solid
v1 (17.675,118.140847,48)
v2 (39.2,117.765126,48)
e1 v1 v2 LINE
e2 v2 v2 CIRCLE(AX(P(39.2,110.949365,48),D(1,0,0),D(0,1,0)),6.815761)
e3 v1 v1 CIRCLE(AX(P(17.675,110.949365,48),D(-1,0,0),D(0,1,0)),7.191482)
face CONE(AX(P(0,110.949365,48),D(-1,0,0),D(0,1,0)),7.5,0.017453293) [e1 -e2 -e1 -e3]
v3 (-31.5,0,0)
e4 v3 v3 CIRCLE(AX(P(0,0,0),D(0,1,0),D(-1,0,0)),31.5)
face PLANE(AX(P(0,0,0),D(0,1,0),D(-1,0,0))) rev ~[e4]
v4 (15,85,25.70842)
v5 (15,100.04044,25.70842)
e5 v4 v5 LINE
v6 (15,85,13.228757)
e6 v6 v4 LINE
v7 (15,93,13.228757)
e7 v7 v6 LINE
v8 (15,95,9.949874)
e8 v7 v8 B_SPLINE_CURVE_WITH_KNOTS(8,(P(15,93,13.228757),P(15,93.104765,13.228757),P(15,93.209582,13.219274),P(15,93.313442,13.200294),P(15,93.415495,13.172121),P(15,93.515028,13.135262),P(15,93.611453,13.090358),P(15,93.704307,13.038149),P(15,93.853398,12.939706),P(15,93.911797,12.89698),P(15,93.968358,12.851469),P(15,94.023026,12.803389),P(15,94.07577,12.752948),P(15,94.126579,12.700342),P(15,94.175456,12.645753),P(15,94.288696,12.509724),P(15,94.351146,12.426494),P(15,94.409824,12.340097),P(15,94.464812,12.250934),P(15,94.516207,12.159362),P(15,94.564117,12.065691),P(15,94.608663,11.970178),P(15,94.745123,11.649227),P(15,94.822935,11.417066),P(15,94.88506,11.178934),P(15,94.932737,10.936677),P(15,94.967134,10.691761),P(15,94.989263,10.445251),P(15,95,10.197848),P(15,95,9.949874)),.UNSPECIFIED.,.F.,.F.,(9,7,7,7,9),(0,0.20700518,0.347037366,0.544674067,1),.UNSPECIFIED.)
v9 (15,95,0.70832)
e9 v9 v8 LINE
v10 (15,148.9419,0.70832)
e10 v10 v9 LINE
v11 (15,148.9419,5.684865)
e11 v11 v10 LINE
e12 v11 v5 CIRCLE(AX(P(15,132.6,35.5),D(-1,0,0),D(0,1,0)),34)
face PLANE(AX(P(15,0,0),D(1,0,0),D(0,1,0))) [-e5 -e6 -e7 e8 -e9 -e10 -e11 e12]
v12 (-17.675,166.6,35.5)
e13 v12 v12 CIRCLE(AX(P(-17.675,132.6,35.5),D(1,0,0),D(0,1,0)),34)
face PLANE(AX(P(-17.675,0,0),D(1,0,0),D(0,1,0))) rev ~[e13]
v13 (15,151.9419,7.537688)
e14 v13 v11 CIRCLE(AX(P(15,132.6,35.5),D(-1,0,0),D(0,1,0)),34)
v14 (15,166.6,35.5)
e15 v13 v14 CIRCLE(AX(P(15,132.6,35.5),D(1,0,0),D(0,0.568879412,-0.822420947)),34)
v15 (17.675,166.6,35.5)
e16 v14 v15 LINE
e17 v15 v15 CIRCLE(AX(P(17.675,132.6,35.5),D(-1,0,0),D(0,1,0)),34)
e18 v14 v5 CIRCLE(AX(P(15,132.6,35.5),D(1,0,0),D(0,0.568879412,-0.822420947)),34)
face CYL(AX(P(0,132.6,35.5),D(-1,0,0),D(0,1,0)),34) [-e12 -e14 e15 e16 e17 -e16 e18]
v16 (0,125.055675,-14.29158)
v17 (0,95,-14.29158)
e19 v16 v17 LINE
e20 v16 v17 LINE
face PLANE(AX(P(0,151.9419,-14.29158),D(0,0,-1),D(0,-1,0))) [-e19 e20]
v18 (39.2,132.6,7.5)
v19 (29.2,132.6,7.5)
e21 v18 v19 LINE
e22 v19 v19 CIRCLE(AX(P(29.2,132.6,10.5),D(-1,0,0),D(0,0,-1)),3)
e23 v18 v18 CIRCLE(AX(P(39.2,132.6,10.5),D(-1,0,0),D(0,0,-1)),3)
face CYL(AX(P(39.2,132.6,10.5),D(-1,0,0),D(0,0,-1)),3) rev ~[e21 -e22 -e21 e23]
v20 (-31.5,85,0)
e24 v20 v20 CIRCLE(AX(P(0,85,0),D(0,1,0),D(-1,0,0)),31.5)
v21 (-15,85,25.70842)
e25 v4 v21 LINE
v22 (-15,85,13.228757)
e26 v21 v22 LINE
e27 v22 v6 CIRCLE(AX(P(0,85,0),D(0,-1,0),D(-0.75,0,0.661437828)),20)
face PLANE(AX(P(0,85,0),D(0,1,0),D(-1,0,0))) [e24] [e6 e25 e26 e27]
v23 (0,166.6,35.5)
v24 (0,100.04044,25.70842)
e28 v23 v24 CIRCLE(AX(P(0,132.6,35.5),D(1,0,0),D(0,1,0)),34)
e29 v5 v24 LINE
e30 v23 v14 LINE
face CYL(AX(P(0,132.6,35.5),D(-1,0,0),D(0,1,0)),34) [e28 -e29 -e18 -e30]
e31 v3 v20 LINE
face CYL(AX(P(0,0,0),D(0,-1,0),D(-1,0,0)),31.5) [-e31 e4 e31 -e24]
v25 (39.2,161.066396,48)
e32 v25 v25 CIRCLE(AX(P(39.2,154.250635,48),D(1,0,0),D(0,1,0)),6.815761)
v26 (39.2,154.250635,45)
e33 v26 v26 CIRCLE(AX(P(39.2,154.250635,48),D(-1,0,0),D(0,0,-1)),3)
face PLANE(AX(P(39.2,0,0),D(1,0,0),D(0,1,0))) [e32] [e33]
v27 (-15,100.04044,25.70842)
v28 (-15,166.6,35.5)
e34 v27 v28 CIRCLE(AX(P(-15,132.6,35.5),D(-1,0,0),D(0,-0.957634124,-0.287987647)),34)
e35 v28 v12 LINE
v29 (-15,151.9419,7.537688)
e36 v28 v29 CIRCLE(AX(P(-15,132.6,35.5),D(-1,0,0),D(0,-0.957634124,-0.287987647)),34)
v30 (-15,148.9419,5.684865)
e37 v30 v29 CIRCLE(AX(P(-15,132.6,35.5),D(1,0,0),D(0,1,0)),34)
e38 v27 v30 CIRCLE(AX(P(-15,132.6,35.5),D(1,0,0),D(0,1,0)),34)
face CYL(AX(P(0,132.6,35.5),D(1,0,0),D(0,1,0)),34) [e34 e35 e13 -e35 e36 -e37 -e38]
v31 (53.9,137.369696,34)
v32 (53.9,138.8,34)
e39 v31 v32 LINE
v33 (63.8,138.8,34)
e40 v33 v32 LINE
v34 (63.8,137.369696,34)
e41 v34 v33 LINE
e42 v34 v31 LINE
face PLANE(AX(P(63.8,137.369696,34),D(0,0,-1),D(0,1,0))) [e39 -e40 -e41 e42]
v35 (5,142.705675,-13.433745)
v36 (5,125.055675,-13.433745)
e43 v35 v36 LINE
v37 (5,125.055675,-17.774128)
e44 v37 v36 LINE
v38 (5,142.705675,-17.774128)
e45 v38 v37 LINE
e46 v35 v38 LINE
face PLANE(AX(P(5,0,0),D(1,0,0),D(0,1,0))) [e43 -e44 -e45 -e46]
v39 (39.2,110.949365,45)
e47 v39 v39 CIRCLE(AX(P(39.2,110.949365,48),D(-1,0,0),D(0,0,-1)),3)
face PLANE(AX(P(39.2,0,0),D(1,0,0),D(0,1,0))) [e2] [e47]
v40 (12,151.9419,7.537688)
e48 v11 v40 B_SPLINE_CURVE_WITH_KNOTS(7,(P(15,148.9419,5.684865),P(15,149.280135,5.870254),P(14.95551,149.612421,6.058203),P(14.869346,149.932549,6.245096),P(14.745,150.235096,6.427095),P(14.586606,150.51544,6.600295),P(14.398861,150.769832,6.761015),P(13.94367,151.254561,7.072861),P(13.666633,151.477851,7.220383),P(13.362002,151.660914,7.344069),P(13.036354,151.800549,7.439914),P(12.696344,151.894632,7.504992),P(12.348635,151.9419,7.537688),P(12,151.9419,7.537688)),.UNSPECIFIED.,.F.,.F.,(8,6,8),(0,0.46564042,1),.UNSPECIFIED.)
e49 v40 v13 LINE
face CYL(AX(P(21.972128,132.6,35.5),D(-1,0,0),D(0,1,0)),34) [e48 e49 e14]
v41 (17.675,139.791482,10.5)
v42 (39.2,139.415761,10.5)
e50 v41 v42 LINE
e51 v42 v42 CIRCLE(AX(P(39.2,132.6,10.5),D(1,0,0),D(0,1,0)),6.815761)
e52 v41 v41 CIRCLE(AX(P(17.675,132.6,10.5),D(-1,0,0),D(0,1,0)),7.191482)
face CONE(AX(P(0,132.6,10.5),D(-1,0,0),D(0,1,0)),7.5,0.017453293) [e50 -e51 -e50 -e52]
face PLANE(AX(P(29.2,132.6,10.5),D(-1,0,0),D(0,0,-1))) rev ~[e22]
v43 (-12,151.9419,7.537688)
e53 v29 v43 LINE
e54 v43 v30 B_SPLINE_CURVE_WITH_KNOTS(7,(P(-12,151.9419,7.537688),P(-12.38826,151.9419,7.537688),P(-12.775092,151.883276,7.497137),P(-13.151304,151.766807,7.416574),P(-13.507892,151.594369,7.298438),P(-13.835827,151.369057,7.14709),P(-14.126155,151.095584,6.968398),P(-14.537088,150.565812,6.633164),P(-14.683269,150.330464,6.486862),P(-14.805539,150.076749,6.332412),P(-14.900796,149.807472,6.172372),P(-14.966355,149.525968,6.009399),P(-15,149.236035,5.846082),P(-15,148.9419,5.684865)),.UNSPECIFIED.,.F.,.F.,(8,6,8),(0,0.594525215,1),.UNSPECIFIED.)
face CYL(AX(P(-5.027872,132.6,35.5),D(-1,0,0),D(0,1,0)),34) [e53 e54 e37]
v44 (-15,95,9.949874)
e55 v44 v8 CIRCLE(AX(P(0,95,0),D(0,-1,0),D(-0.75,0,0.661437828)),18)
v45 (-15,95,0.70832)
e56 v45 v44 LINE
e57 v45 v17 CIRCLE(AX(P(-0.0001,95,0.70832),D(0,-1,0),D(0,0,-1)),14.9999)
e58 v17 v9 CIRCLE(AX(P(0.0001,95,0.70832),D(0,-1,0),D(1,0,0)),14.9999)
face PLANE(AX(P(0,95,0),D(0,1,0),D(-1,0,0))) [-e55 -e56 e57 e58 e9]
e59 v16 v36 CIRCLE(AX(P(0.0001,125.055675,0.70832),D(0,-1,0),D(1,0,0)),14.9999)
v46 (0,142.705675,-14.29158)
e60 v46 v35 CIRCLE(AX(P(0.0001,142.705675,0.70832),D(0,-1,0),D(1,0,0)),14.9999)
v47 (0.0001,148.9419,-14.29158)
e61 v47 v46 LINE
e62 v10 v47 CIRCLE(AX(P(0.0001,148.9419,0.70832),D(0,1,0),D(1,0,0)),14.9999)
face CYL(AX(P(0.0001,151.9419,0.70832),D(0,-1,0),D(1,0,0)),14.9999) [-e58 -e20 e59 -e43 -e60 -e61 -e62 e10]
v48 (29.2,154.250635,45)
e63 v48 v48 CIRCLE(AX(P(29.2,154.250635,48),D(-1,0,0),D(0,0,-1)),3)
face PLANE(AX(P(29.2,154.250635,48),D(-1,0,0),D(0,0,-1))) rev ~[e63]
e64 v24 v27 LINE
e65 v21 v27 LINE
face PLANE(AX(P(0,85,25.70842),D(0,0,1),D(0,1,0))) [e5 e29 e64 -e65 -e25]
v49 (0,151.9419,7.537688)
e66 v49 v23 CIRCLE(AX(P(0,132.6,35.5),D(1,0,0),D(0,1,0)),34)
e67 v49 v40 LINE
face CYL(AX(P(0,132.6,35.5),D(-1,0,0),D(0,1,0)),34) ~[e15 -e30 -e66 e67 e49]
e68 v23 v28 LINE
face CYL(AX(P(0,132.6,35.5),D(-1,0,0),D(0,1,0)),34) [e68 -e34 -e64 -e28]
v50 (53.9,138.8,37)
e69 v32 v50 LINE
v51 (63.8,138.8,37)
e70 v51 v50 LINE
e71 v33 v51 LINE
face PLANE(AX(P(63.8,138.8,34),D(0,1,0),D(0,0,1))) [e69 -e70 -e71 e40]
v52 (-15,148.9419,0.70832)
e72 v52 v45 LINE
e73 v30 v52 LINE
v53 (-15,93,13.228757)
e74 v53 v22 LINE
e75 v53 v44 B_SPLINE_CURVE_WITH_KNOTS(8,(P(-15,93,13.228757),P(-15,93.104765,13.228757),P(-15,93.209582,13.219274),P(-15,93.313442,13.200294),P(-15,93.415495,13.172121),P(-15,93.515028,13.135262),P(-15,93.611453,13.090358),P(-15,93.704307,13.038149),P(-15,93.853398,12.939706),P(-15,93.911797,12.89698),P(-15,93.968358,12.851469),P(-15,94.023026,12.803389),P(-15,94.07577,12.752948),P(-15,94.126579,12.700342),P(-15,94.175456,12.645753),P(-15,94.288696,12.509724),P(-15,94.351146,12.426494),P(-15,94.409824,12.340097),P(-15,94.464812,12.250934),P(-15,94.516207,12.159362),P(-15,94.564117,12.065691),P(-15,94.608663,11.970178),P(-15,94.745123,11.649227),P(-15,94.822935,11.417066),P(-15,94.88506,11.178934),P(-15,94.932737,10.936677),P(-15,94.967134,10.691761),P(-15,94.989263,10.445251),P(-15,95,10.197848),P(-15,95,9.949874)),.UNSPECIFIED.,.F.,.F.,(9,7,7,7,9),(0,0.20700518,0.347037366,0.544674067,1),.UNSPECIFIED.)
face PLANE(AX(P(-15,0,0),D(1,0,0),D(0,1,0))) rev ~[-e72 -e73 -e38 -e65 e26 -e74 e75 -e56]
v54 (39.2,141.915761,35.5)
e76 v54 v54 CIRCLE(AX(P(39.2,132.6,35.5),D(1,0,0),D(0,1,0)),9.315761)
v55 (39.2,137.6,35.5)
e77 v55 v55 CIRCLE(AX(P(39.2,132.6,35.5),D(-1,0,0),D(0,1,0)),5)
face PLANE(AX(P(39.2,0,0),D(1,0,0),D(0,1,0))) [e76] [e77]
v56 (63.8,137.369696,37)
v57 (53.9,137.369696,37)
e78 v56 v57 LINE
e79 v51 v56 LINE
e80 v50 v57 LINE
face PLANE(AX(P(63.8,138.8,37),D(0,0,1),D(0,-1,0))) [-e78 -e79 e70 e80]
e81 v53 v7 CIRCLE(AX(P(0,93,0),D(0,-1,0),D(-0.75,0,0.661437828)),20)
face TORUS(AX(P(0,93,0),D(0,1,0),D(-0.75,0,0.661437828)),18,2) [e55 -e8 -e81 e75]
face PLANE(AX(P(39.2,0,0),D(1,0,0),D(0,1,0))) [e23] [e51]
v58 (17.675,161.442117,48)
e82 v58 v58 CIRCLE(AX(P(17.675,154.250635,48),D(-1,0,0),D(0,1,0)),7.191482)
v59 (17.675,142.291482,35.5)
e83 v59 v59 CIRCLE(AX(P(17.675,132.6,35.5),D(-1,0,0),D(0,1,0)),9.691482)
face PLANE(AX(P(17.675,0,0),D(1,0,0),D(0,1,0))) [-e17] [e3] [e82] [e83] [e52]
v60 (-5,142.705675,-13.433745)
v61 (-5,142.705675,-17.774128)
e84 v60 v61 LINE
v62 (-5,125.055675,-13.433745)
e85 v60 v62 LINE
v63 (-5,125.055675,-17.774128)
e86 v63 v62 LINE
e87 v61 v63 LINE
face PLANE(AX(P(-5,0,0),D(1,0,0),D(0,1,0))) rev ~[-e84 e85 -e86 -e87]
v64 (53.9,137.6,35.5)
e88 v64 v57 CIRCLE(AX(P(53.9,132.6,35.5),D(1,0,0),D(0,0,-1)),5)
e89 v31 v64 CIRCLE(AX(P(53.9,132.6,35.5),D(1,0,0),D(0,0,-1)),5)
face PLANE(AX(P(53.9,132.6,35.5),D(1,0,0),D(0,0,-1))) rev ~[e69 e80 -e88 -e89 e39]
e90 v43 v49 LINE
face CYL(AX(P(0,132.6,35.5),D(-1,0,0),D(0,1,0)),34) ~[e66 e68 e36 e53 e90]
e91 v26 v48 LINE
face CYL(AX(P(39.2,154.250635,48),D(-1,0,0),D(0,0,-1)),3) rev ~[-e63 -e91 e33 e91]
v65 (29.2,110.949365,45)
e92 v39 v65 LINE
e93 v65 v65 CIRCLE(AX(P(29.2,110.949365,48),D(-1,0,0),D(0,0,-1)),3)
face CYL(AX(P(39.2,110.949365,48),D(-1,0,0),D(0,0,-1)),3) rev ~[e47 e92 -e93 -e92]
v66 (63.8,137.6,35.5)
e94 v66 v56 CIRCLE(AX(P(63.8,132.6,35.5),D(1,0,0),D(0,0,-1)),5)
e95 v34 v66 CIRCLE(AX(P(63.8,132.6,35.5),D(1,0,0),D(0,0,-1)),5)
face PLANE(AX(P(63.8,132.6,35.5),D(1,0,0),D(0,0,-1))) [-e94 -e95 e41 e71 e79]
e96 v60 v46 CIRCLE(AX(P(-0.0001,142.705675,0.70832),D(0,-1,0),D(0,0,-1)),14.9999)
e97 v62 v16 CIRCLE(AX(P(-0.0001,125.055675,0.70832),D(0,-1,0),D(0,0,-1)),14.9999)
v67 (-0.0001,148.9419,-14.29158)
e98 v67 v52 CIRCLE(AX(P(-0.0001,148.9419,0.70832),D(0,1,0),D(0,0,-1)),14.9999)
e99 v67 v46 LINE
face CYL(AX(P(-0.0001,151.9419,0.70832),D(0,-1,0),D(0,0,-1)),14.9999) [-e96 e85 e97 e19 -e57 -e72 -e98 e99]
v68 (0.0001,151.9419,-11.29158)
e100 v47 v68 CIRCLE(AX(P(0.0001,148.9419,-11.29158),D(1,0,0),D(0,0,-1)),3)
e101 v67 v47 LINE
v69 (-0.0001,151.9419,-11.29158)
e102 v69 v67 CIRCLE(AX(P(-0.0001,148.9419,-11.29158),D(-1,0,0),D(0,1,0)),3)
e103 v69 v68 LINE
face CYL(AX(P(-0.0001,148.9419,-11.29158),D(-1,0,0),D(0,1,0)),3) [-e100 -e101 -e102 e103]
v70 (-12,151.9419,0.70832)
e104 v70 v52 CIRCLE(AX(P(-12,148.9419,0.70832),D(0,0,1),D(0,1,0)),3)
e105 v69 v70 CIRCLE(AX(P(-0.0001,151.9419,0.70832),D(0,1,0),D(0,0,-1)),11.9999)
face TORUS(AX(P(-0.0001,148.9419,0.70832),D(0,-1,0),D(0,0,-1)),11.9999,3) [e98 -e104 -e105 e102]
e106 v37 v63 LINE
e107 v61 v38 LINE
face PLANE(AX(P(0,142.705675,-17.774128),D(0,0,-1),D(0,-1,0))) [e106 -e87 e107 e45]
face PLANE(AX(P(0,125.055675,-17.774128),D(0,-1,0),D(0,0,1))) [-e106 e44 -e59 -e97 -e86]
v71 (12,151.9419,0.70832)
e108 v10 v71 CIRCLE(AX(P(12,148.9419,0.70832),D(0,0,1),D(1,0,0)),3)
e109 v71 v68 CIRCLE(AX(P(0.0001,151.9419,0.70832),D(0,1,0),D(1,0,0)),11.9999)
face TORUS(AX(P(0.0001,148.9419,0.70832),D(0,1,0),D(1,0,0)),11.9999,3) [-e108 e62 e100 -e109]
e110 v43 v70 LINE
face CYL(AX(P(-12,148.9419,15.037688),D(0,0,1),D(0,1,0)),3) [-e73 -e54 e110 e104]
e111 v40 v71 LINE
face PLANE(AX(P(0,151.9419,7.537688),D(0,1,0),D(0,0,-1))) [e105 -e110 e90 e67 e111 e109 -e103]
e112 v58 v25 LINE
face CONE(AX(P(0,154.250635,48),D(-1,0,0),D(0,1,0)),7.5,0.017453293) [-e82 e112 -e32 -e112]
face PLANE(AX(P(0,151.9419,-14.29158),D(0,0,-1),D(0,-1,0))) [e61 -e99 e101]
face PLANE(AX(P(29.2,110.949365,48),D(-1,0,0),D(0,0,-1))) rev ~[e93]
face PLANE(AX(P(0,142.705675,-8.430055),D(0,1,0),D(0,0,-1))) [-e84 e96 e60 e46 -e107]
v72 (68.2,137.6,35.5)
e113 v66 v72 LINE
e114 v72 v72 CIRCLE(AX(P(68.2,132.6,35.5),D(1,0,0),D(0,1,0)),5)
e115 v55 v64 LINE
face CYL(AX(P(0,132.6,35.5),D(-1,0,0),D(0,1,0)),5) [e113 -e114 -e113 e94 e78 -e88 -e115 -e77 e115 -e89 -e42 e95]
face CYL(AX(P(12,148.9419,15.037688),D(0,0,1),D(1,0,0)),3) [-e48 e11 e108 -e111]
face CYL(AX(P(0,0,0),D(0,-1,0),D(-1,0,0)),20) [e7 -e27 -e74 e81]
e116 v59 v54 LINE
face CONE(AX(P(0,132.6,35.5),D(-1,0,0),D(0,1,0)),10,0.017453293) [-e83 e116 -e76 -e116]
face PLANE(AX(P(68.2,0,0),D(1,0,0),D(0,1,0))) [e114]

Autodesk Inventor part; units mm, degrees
sketch "Sketch1" plane through (0, 0, 0) normal (0, 1, 0) x (-1, 0, 0)
  circle A0 centre (0, 0) radius 31.5
  circle A1 centre (0, 0) radius 20
  dimension "d0" = 63
  dimension "d29" = 40
extrude "Extrusion1" add sketch "Sketch1" along normal blind 85 contours A0 | A1
sketch "Sketch2" plane through (0, 0, 0) normal (1, 0, 0) x (0, 1, 0)
  line L0 (0, -31.5) -> (85, -31.5)
  line L1 (0, -31.5) -> (0, 69.5)
  line L2 (0, 69.5) -> (166.6, 69.5)
  line L3 (166.6, 69.5) -> (166.6, 35.5)
  line L4 (166.6, 35.5) -> (132.6, 35.5)
  circle A0 centre (132.6, 35.5) radius 34
  circle A1 centre (132.6, 35.5) radius 25
  circle A2 centre (132.6, 10.5) radius 7.5
  circle A3 centre (132.6, 10.5) radius 3
  circle A4 centre (154.250635, 48) radius 7.5
  circle A5 centre (154.250635, 48) radius 3
  circle A6 centre (110.949365, 48) radius 7.5
  circle A7 centre (110.949365, 48) radius 3
  line L5 (85, -31.5) -> (85, 31.5)
  line L6 (85, 25.70842) -> (151.9419, 25.70842)
  line L7 (151.9419, 25.70842) -> (151.9419, -14.29158)
  line L8 (151.9419, -14.29158) -> (85, -14.29158)
  line L9 (85, -14.29158) -> (85, 25.70842)
  circle A8 centre (132.6, 35.5) radius 10
  circle A9 centre (132.6, 35.5) radius 5
  line L10 (85, 31.5) -> (85, 0)
  line L11 (85, 0) -> (100.814017, 0)
  point P0 (0, 0)
  point P1 (151.9419, 7.537688)
  point P2 (134.938396, 1.580508)
  point P3 (130.261604, 1.580508)
  point P4 (100.04044, 25.70842)
  point P5 (92.907008, 0)
  dimension "d8" = 50
  dimension "d3" = 101
  dimension "d4" = 166.6
  dimension "d5" = 34
  dimension "d6" = 34
  dimension "d7" = 68
  dimension "d9" = 15
  dimension "d10" = 6
  dimension "d13" = 360
  dimension "d21" = 20
  dimension "d22" = 10
  dimension "d26" = 40
  dimension "d49" = 69.5
  dimension "d50" = 35.5
extrude "Extrusion2" add sketch "Sketch2" along normal mid plane 30 contours L5 L6 A0 L7 L8 | A0 L4 A1 A4 A6 L6 | A0 L7 A1 L4 | L6 A1 A2 L7 A0 | A1 L7 L6 A8 L4 | L4 A8 L6 A1 A6 A4 | L6 A8 L7 A1 A2 | A8 L6 | A4 A1 A5 | A1 A5 A4 | A6 A1 A7 | A1 A7 A6 | L6 A8 | A5 A1 | A1 A5 | A7 A1 | A1 A7 | A9
sketch "Sketch2 outline for Extrusion3" plane through (0, 0, 0) normal (1, 0, 0) x (0, 1, 0)
  circle A0 centre (110.949365, 48) radius 7.5
  circle A1 centre (132.6, 10.5) radius 7.5
  circle A2 centre (154.250635, 48) radius 7.5
  circle A3 centre (132.6, 35.5) radius 10
extrude "Extrusion3" add sketch "Sketch2 outline for Extrusion3" along normal blind 39.2 draft -1
extrude "Extrusion4" add sketch "Sketch2" along normal mid plane 35.35 contours A0 L4 A1 A4 A6 L6 | A0 L7 A1 L4 | L6 A1 A2 L7 A0 | A1 L7 L6 A8 L4 | L4 A8 L6 A1 A6 A4 | L6 A8 L7 A1 A2 | A8 L6 | A4 A1 A5 | A1 A5 A4 | A6 A1 A7 | A1 A7 A6 | A2 A1 A3 | A1 A3 A2 | L6 A8 | A5 A1 | A1 A5 | A7 A1 | A1 A7 | A3 A1 | A1 A3 | A9
extrude "Extrusion5" add sketch "Sketch2" along normal blind 68.2 contours A9
ref_plane "Work Plane1" through (-31.5, 0, 0) normal (1, 0, 0) x (0, 1, 0)
fillet "Fillet1" radius 15 2 edges at (15, 118.471, -14.2916) (-15, 118.471, -14.2916)
fillet "Fillet2" radius 3 3 edges at (15, 151.9419, 4.123) (-15, 151.9419, 4.123) (10.6066, 151.9419, -9.8982)
extrude "Extrusion6" add sketch "Sketch1" along normal blind 95 contours A1
fillet "Fillet3" radius 2 1 edges at (0, 95, -20)
ref_plane "Work Plane2" through (63.8, 132.6, 35.5) normal (1, 0, 0) x (0, 0, -1)
sketch "Sketch3" plane through (39.2, 154.250635, 48) normal (1, 0, 0) x (0, 0, -1)
  circle A0 centre (0, 0) radius 3
  circle A1 centre (37.5, -21.650635) radius 6.815761
  circle A2 centre (37.5, -21.650635) radius 3
  circle A3 centre (0, -43.30127) radius 6.815761
  circle A4 centre (0, -43.30127) radius 3
  point P0 (48, -154.250635)
  dimension "d33" = 6
  dimension "d34" = 6
  dimension "d35" = 6
hole "Hole1" at (39.2, 154.250635, 48) at (39.2, 132.6, 10.5) at (39.2, 110.949365, 48) direction (-1, 0, 0) diameter 6 depth 10
sketch "Sketch4" plane through (63.8, 132.6, 35.5) normal (1, 0, 0) x (0, 0, -1)
  line L0 (-1.5, 3.8) -> (1.5, 3.8)
  line L1 (1.5, 3.8) -> (1.5, 6.2)
  line L2 (1.5, 6.2) -> (-1.5, 6.2)
  line L3 (-1.5, 6.2) -> (-1.5, 3.8)
  circle A0 centre (0, 0) radius 5 projected
  line L4 (-1.5, 3.8) -> (1.5, 6.2) construction
  line L5 (1.5, 3.8) -> (-1.5, 6.2) construction
  point P0 (35.5, -132.6)
  point P1 (0, 5)
  point P2 (-1.5, 4.769696)
  point P3 (1.5, 4.769696)
  dimension "d43" = 1.2
  dimension "d44" = 3
extrude "Extrusion7" add sketch "Sketch4" against normal blind 9.9 contours L3 L2 L1 A0
ref_plane "Work Plane3" through (0, 0, -31.5) normal (0, 0, 1) x (1, 0, 0)
sketch "Sketch5" plane through (68.2, 132.6, 35.5) normal (1, 0, 0) x (0, 0, -1)
  circle A0 centre (0, 0) radius 9.315761 construction
  circle A1 centre (25, 0) radius 3 construction
  line L0 (0, 0) -> (25, 0) construction
  line L1 (49.79158, -37.6) -> (49.79158, 16.3419)
  circle A2 centre (0, 0) radius 34
  line L2 (49.79158, 0) -> (-34, 0)
  point P0 (35.5, -132.6)
sketch "Sketch6" plane through (0, 0, 0) normal (1, 0, 0) x (0, 1, 0)
  line L0 (142.705675, -17.774128) -> (125.055675, -17.774128)
  line L1 (125.055675, -17.774128) -> (125.055675, -8.430055)
  line L2 (125.055675, -8.430055) -> (142.705675, -8.430055)
  line L3 (142.705675, -8.430055) -> (142.705675, -17.774128)
  circle A0 centre (132.6, 35.5) radius 34
  point P0 (0, 0)
  point P1 (133.880675, 69.475872)
  point P2 (133.880675, -17.774128)
  dimension "d51" = 87.25
  dimension "d52" = 17.65
extrude "Extrusion8" add sketch "Sketch6" along normal mid plane 10 contours L0 L1 L2 L3
sketch "Sketch7" plane through (0, 0, 0) normal (1, 0, 0) x (0, 1, 0)
  point P0 (0, 0)
properties part number "motor" material "ABS Plastic"
